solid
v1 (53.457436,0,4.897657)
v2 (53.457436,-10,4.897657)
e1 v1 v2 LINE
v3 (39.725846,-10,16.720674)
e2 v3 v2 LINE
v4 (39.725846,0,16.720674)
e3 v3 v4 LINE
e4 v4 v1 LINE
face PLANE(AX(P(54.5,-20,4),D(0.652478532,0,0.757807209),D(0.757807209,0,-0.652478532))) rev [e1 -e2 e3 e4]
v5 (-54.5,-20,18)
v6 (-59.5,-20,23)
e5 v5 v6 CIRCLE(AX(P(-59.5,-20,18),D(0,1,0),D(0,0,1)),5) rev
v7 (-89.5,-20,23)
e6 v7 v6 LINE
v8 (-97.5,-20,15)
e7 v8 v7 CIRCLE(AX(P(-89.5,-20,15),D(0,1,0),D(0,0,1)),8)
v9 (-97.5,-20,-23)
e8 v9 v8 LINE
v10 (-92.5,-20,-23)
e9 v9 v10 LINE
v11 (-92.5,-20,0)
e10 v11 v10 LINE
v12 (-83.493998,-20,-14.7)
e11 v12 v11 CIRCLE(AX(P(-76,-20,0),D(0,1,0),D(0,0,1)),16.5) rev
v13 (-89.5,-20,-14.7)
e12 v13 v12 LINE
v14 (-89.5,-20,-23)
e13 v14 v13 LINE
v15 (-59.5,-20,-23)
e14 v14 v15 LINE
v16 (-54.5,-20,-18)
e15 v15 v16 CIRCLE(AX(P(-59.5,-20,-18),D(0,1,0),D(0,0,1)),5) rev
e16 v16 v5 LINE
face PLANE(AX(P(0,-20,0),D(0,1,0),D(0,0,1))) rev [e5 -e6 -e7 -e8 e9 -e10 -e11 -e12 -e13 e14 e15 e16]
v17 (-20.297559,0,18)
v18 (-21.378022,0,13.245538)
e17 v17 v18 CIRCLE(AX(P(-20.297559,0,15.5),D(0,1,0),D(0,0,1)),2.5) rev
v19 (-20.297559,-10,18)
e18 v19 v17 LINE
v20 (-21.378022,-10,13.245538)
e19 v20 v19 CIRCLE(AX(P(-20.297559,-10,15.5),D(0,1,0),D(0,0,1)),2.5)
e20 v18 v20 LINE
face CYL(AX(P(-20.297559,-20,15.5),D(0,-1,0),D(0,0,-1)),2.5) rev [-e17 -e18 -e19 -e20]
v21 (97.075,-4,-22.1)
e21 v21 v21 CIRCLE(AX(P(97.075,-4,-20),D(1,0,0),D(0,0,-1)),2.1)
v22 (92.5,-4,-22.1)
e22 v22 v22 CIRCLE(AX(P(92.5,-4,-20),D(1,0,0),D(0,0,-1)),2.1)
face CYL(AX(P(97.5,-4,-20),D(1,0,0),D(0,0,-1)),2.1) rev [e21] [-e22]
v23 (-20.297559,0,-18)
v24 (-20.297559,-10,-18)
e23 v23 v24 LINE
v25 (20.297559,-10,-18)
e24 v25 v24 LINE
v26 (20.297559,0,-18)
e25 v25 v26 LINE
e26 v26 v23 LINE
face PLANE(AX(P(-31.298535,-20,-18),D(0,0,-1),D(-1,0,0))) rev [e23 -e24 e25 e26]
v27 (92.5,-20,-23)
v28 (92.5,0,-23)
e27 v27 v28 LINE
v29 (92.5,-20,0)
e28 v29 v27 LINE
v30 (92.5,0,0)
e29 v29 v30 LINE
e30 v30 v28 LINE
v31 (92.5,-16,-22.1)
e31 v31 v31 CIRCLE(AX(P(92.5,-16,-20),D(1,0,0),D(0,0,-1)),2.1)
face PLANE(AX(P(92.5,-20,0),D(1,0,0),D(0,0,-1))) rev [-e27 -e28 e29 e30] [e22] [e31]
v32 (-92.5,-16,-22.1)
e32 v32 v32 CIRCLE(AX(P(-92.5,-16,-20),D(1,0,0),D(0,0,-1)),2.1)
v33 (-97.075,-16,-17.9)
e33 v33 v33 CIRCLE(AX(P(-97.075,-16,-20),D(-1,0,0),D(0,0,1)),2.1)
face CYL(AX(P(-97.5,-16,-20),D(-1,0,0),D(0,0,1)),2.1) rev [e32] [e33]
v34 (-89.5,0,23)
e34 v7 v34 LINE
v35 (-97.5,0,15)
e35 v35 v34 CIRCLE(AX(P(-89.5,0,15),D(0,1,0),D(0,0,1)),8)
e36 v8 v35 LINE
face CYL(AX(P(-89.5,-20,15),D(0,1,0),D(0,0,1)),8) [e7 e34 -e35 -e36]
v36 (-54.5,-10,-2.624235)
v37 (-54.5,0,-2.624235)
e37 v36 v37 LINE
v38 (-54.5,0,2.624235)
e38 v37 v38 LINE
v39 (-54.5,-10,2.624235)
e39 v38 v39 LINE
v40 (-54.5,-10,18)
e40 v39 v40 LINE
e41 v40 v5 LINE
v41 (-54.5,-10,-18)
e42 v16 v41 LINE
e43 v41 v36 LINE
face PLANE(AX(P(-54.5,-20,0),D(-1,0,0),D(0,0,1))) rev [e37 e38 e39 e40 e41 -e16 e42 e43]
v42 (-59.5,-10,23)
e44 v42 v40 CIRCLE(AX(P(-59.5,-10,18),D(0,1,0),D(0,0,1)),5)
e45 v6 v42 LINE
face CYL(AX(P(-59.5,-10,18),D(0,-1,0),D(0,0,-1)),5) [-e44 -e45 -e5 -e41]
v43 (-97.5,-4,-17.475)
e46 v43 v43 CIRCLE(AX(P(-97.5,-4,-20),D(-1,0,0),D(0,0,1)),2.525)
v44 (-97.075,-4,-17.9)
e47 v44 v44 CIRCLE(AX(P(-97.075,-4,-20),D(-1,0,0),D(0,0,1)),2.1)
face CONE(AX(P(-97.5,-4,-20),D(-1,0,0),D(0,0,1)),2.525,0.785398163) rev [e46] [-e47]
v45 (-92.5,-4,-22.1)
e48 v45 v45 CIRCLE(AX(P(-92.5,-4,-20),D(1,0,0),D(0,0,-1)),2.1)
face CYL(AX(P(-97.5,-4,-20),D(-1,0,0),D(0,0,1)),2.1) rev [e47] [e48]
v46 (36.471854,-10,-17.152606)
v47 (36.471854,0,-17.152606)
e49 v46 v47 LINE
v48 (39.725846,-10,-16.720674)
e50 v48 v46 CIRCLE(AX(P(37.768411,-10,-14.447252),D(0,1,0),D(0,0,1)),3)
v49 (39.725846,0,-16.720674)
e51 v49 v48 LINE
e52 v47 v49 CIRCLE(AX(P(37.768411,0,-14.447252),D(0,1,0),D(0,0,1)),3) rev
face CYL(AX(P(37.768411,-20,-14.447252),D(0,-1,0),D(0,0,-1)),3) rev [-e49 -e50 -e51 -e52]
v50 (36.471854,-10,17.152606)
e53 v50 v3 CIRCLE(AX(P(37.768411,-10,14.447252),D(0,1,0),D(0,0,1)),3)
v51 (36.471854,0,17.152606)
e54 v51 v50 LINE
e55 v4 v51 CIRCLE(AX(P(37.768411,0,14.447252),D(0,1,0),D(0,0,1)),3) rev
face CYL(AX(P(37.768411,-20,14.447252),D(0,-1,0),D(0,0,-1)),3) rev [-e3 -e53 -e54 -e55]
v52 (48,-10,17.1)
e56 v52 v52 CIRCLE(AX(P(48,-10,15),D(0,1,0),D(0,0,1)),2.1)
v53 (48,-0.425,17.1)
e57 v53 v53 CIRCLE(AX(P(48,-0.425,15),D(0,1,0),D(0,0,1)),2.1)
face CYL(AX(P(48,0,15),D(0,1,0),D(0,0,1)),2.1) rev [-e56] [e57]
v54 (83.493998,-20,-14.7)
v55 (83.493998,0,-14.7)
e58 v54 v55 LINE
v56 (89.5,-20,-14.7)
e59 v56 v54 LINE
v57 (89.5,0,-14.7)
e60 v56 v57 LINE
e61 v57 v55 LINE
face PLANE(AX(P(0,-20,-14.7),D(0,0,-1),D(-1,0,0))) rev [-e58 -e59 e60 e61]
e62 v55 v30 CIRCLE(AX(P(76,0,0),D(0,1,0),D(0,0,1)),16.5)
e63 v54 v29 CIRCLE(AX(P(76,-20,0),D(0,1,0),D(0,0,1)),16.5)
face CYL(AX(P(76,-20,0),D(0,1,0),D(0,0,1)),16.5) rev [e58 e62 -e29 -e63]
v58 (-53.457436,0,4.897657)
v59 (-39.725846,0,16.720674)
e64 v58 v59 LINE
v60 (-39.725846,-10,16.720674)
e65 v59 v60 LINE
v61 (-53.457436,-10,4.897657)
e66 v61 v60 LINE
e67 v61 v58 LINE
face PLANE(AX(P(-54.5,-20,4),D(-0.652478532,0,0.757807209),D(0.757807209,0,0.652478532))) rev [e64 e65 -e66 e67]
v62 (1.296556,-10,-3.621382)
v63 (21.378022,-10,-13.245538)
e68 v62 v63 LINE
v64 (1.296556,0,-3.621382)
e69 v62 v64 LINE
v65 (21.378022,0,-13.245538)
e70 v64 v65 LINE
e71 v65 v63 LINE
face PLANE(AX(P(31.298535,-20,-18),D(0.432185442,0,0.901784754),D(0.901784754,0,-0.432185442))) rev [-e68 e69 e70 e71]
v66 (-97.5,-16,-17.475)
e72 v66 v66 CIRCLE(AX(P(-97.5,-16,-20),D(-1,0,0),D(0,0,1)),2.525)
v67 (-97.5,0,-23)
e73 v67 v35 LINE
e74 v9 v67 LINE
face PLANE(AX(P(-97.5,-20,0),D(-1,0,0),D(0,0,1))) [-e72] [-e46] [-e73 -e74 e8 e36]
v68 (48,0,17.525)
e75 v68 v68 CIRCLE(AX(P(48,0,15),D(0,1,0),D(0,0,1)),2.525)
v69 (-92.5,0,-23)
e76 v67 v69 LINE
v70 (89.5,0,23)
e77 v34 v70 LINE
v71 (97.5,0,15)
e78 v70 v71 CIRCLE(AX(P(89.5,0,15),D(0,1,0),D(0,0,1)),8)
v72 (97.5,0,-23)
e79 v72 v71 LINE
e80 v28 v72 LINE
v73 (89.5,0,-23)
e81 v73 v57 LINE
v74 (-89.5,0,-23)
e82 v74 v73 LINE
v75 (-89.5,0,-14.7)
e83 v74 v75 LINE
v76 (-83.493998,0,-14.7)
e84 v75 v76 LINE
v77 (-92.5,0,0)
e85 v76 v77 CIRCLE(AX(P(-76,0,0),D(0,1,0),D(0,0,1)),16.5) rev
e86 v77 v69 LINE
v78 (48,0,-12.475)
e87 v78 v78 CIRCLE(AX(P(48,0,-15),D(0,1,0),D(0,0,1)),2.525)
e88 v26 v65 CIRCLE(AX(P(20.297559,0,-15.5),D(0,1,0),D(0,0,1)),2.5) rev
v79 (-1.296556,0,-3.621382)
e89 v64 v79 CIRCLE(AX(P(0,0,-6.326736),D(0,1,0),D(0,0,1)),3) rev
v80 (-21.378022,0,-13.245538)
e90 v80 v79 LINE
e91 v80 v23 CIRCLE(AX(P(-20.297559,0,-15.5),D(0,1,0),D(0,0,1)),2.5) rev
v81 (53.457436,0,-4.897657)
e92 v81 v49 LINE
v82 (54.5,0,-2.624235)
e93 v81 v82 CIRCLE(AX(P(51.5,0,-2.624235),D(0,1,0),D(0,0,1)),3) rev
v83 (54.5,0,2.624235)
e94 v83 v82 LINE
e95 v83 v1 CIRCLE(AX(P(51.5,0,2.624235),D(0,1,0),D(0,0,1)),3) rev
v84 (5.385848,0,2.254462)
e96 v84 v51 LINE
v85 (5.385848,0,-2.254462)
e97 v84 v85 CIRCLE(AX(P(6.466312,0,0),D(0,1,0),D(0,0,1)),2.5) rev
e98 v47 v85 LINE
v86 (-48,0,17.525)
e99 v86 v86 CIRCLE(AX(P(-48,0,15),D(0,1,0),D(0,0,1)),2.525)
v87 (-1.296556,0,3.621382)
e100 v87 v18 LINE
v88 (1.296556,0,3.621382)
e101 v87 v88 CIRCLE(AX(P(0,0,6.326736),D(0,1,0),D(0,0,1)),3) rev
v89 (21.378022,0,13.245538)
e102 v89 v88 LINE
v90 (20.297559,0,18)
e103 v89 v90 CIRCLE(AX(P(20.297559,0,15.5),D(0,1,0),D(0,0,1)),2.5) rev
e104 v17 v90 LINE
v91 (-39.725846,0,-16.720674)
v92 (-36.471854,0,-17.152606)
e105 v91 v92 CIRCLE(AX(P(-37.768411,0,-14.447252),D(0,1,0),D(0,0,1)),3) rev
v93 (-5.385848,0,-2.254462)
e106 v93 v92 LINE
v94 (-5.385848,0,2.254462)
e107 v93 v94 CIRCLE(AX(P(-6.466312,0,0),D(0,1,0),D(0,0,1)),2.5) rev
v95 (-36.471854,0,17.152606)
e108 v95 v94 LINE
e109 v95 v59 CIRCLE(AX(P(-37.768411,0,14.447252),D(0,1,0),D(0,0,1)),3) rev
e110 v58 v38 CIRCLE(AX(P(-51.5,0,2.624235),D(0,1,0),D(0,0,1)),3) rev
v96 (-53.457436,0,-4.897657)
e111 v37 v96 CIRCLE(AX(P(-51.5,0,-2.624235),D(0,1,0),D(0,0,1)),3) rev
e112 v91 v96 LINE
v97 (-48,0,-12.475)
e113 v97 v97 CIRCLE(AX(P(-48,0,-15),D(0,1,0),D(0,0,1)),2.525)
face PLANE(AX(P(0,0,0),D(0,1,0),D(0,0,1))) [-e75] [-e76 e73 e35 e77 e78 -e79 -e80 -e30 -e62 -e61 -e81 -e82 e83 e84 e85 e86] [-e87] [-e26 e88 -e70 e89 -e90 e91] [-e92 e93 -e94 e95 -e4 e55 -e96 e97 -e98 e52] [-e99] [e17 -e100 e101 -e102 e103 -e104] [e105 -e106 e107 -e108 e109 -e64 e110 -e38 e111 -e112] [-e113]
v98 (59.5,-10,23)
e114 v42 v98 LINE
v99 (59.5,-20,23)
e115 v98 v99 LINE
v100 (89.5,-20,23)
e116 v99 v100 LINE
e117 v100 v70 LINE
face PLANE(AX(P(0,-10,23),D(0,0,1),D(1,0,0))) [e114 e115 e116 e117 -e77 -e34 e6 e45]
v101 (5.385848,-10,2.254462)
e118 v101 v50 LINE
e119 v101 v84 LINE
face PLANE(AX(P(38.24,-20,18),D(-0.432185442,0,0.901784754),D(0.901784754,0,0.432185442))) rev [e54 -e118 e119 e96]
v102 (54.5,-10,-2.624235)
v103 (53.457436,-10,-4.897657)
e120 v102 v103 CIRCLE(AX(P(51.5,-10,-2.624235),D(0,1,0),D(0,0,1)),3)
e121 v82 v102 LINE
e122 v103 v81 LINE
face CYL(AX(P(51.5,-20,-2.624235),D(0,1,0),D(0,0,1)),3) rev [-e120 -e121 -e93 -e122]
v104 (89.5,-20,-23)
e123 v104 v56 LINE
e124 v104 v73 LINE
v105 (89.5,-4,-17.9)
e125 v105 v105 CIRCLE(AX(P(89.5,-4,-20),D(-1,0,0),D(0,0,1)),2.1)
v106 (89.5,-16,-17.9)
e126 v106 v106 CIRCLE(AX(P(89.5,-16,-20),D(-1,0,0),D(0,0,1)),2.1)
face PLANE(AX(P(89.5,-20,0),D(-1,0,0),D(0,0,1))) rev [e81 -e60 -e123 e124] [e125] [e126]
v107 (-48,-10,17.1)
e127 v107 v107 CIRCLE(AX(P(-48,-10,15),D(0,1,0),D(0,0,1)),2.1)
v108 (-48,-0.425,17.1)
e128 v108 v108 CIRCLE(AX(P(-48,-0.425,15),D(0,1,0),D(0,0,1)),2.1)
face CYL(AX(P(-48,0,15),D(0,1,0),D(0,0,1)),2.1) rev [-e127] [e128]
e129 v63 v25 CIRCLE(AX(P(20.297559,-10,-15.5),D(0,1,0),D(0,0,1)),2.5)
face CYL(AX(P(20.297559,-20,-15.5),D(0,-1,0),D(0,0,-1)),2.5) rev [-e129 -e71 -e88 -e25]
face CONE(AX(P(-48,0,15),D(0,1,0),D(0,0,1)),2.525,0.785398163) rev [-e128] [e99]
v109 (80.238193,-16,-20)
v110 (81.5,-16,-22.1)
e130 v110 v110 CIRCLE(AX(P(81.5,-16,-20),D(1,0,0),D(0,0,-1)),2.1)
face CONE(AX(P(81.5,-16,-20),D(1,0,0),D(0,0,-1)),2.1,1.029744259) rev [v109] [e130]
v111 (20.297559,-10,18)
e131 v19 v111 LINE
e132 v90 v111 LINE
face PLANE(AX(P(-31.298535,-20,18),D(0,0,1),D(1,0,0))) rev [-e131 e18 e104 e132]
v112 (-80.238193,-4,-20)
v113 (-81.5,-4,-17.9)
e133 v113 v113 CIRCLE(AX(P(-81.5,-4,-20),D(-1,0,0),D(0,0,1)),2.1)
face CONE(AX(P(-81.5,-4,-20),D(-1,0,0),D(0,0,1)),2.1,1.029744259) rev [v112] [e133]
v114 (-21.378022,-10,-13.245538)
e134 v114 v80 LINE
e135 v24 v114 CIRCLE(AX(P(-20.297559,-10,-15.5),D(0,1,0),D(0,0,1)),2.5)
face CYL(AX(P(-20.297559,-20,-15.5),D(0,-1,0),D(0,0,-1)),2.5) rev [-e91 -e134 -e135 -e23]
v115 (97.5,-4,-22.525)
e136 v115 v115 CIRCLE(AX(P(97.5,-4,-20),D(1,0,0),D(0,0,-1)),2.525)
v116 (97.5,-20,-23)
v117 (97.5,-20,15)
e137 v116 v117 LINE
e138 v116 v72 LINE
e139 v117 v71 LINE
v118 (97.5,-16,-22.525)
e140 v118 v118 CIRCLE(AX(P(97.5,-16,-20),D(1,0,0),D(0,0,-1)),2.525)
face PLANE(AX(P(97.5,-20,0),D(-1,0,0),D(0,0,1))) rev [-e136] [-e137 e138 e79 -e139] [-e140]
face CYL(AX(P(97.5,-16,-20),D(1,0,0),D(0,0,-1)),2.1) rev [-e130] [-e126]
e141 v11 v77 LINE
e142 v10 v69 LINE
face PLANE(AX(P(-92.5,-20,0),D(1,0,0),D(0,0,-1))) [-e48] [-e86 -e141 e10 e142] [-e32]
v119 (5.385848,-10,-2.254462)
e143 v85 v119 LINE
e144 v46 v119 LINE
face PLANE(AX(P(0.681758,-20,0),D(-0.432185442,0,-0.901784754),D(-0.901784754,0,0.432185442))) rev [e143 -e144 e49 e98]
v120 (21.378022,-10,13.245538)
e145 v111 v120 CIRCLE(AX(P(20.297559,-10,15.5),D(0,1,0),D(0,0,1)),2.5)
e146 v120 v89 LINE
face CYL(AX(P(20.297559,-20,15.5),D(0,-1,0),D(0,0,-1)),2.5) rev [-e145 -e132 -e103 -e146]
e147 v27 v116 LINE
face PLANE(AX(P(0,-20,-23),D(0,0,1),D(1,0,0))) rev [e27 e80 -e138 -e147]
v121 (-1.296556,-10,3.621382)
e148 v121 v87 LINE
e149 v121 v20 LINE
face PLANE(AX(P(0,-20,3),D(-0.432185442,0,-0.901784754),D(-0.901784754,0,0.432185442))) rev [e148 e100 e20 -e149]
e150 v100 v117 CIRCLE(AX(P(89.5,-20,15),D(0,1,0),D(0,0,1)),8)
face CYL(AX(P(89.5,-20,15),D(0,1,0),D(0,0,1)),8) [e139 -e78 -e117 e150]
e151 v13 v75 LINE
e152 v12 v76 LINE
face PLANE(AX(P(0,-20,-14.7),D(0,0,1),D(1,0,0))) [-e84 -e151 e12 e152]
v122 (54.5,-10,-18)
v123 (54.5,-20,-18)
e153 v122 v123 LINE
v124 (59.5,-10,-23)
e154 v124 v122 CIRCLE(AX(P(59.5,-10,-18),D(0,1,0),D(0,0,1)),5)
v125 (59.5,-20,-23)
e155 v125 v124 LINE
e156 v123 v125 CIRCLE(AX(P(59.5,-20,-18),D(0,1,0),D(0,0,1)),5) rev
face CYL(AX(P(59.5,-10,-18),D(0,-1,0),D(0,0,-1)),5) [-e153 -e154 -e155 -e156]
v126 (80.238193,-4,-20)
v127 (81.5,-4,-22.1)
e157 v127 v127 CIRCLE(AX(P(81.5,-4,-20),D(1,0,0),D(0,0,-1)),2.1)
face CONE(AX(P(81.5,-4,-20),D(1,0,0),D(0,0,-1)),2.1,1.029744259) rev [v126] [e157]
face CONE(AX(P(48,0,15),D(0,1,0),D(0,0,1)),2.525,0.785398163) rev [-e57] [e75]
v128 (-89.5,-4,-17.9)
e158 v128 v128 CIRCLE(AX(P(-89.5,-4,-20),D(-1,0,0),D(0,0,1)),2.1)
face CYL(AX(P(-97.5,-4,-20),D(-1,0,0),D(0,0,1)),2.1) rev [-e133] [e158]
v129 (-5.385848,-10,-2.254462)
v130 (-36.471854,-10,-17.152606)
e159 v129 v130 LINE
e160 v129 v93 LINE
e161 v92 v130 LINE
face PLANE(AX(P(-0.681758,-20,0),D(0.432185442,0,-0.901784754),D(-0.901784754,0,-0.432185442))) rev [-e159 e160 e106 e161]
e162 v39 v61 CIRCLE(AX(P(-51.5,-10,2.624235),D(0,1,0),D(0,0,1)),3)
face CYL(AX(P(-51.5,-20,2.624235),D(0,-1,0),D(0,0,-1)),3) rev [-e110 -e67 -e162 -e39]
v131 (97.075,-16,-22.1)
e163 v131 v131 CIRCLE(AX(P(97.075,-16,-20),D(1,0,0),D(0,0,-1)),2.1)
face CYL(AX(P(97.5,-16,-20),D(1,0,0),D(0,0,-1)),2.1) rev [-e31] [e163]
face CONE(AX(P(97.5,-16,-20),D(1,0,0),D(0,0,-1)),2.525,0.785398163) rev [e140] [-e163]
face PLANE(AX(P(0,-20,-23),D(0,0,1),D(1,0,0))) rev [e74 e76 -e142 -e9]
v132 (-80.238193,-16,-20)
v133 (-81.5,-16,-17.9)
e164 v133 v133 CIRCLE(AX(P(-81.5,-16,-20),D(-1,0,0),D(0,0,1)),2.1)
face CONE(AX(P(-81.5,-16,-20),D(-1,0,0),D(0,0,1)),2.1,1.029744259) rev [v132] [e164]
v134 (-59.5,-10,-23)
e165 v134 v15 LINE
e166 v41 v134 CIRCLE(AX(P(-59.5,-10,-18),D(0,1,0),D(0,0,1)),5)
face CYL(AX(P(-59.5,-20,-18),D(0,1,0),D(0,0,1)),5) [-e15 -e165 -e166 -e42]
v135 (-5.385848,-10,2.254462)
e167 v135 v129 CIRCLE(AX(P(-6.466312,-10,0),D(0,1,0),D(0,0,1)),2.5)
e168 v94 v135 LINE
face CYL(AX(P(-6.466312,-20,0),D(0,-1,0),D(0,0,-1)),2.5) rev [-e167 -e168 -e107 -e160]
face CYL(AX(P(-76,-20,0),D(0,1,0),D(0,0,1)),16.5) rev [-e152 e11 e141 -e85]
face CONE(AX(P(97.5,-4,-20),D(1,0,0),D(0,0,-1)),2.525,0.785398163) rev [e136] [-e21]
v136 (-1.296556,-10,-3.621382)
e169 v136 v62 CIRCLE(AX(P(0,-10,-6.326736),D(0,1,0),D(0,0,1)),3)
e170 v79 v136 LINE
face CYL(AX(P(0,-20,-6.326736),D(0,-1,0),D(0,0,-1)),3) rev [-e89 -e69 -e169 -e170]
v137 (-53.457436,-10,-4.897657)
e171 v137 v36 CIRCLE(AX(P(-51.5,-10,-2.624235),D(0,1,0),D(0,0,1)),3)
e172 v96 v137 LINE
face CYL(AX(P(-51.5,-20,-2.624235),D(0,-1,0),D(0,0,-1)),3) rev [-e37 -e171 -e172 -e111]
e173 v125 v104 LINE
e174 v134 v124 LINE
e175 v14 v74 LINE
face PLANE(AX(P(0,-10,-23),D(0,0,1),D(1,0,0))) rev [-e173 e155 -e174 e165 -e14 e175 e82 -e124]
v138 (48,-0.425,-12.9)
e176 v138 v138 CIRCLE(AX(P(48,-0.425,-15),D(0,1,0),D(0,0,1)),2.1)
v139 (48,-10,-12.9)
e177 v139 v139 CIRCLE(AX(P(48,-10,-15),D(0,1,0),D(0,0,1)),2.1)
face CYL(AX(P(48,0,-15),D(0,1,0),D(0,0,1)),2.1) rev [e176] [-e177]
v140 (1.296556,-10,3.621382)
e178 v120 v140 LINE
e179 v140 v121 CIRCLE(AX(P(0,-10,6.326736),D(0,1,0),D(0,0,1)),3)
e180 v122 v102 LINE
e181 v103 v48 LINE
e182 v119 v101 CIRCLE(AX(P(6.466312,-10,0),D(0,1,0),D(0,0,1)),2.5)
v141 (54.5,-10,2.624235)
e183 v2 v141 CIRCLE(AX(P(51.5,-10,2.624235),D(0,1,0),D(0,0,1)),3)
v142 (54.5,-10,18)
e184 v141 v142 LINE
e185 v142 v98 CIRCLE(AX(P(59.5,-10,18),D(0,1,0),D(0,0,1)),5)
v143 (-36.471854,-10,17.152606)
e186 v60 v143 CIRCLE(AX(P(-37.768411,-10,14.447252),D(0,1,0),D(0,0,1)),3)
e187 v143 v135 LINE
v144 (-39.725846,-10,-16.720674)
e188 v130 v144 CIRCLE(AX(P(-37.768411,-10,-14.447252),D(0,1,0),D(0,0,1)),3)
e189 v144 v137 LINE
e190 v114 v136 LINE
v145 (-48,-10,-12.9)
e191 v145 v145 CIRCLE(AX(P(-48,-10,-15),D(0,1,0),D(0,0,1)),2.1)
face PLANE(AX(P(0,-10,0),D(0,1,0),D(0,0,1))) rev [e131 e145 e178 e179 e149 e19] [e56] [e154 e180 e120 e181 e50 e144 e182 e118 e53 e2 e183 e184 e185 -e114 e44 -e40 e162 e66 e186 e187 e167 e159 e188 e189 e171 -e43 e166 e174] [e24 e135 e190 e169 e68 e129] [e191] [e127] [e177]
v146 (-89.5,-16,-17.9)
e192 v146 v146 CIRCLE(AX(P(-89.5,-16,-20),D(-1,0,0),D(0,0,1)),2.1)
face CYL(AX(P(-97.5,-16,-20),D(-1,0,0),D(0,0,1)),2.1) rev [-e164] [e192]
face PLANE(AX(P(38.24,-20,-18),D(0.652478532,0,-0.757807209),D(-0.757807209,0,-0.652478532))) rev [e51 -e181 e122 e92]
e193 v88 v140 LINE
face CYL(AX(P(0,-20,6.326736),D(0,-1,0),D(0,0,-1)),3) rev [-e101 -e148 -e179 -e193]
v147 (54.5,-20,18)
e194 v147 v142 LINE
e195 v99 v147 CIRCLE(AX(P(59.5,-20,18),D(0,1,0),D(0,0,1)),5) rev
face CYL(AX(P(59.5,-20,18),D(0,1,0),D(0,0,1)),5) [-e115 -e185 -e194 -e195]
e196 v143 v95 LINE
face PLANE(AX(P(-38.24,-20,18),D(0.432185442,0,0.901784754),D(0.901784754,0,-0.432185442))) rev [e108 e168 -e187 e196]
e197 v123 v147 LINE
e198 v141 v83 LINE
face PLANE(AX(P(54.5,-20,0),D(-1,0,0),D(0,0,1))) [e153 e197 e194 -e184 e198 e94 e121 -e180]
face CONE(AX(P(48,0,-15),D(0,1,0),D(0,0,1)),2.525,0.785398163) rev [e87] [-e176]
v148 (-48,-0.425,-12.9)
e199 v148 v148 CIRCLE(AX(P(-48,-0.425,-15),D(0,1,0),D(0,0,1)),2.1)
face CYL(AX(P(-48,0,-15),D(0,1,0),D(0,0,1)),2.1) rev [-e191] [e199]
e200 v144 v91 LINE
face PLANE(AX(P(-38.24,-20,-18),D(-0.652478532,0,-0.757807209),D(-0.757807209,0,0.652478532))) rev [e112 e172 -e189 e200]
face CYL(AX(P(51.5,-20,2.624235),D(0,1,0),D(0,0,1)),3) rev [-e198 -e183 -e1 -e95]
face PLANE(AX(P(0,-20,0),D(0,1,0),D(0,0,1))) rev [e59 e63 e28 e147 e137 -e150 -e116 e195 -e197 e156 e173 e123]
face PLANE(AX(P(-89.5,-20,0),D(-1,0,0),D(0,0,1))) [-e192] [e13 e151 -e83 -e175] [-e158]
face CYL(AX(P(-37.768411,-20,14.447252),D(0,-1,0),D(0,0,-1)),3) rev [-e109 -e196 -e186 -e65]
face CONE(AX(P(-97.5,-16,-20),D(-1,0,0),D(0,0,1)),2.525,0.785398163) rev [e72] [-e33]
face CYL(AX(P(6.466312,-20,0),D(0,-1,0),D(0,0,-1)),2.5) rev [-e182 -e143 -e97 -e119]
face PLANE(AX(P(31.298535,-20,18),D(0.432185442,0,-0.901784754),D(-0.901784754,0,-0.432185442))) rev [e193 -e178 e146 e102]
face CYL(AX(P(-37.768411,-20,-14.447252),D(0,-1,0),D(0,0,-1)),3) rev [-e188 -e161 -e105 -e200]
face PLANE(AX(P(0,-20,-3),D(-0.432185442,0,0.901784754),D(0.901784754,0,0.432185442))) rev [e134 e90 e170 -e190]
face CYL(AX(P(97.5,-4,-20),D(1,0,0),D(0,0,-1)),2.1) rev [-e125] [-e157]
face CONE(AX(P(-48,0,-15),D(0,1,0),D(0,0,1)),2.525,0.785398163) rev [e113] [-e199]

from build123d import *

# Parameters (mm, degrees)
SKETCH1_W                  = 109
SKETCH1_H                  = 46
BOSS_EXTRUDE1_DEPTH        = 10
BOSS_EXTRUDE2_DEPTH        = 20
FILLET1_R                  = 5
CUT_EXTRUDE1_DEPTH         = 103.153071417
M5_TAPPED_HOLE2_AT_2_COUNT = 2
M5_TAPPED_HOLE2_AT_2_PITCH = 12
FILLET2_R                  = 2.5
FILLET3_R                  = 3


# Read off the part's stored shape, not the designer's step: M5 Tapped Hole1
with BuildPart() as part:
    # Sketch1 → Boss-Extrude1 (new body)
    with BuildSketch(Plane(origin=(0, 0, 0), x_dir=(1, 0, 0), z_dir=(0, 1, 0))):
        Rectangle(SKETCH1_W, SKETCH1_H)
    extrude(amount=-BOSS_EXTRUDE1_DEPTH)

    # Sketch1<3> → Boss-Extrude2 (add)
    with BuildSketch(Plane(origin=(0, 0, 0), x_dir=(1, 0, 0), z_dir=(0, 1, 0))):
        with BuildLine():
            Line((-54.5, -23), (-54.5, 23))
            Line((-54.5, 23), (-89.5, 23))
            Line((-89.5, 23), (-89.5, 14.7))
            Line((-89.5, 14.7), (-83.493997598, 14.7))
            ThreePointArc((-83.493997598, 14.7), (-61.930512441, -8.619716922), (-92.5, 0))
            Line((-92.5, 0), (-92.5, 23))
            Line((-92.5, 23), (-97.5, 23))
            Line((-97.5, 23), (-97.5, -15))
            ThreePointArc((-97.5, -15), (-95.156854249, -20.656854249), (-89.5, -23))
            Line((-89.5, -23), (-54.5, -23))
        make_face()
        with BuildLine():
            Line((92.5, 23), (92.5, 0))
            ThreePointArc((92.5, 0), (61.930512441, -8.619716922), (83.493997598, 14.7))
            Line((83.493997598, 14.7), (89.5, 14.7))
            Line((89.5, 14.7), (89.5, 23))
            Line((89.5, 23), (54.5, 23))
            Line((54.5, 23), (54.5, -23))
            Line((54.5, -23), (89.5, -23))
            ThreePointArc((89.5, -23), (95.156854249, -20.656854249), (97.5, -15))
            Line((97.5, -15), (97.5, 23))
            Line((97.5, 23), (92.5, 23))
        make_face()
    extrude(amount=-BOSS_EXTRUDE2_DEPTH)

    # Fillet1
    fillet1_edges = [part.edges().sort_by_distance(p)[0] for p in [
        (-54.5, -15, -23),
        (-54.5, -15, 23),
        (54.5, -15, 23),
        (54.5, -15, -23),
    ]]
    fillet(fillet1_edges, radius=FILLET1_R)

    # M5 Tapped Hole1 outline → M5 Tapped Hole1 (revolve, cut)
    with BuildSketch(Plane(origin=(48, 0, -15), x_dir=(1, 0, 0), z_dir=(0, 0, 1))):
        Polygon((0, -10), (2.1, -10), (2.1, -0.425), (2.525, 0), (0, 0), align=None)
    revolve(axis=Axis((48, 0, -15), (0, 1, 0)), mode=Mode.SUBTRACT)

    # M5 Tapped Hole1 2 outline → M5 Tapped Hole1 2 (revolve, cut)
    with BuildSketch(Plane(origin=(-48, 0, 15), x_dir=(1, 0, 0), z_dir=(0, 0, 1))):
        Polygon((0, -10), (2.1, -10), (2.1, -0.425), (2.525, 0), (0, 0), align=None)
    revolve(axis=Axis((-48, 0, 15), (0, 1, 0)), mode=Mode.SUBTRACT)

    # M5 Tapped Hole1 3 outline → M5 Tapped Hole1 3 (revolve, cut)
    with BuildSketch(Plane(origin=(-48, 0, -15), x_dir=(1, 0, 0), z_dir=(0, 0, 1))):
        Polygon((0, -10), (2.1, -10), (2.1, -0.425), (2.525, 0), (0, 0), align=None)
    revolve(axis=Axis((-48, 0, -15), (0, 1, 0)), mode=Mode.SUBTRACT)

    # M5 Tapped Hole1 4 outline → M5 Tapped Hole1 4 (revolve, cut)
    with BuildSketch(Plane(origin=(48, 0, 15), x_dir=(1, 0, 0), z_dir=(0, 0, 1))):
        Polygon((0, -10), (2.1, -10), (2.1, -0.425), (2.525, 0), (0, 0), align=None)
    revolve(axis=Axis((48, 0, 15), (0, 1, 0)), mode=Mode.SUBTRACT)

    # Sketch7 → Cut-Extrude1 (cut, through all)
    with BuildSketch(Plane(origin=(0, 0, 0), x_dir=(1, 0, 0), z_dir=(0, 1, 0))):
        Polygon((-31.298535282, 18), (31.298535282, 18), (0, 3), align=None)
        Polygon((-54.5, 4), (-54.5, -4), (-38.24, -18), (-0.681757662, 0), (-38.24, 18), align=None)
        Polygon((31.298535282, -18), (0, -3), (-31.298535282, -18), align=None)
        Polygon((38.24, -18), (0.681757662, 0), (38.24, 18), (54.5, 4), (54.5, -4), align=None)
    extrude(amount=-CUT_EXTRUDE1_DEPTH, mode=Mode.SUBTRACT)

    # Sketch9 → M5 Tapped Hole2 (revolve, cut)
    with BuildSketch(Plane(origin=(97.5, -4, -20), x_dir=(0, 0, -1), z_dir=(0, 1, 0))):
        Polygon((0, 0), (0, 17.2618073), (2.1, 16), (2.1, 0.425), (2.525, 0), align=None)
    m5_tapped_hole2 = revolve(axis=Axis((103.85, -4, -20), (-1, 0, 0)), mode=Mode.SUBTRACT)

    # M5 Tapped Hole2 at 2: M5 Tapped Hole2 ×2
    with Locations(*[(0, -i * M5_TAPPED_HOLE2_AT_2_PITCH, 0) for i in range(1, M5_TAPPED_HOLE2_AT_2_COUNT)]):
        add(m5_tapped_hole2, mode=Mode.SUBTRACT)

    # Mirror1: M5 Tapped Hole2 across plane
    add(m5_tapped_hole2.mirror(Plane(origin=(0, 0, 0), x_dir=(0, 0, 1), z_dir=(1, 0, 0))), mode=Mode.SUBTRACT)

    # Mirror1 copy 1 sketch → Mirror1 copy 1 (revolve, cut)
    with BuildSketch(Plane(origin=(-97.5, -16, -20), x_dir=(0, 0, -1), z_dir=(0, 1, 0))):
        Polygon((0, 0), (0, -17.2618073), (2.1, -16), (2.1, -0.425), (2.525, 0), align=None)
    revolve(axis=Axis((-103.85, -16, -20), (-1, 0, 0)), mode=Mode.SUBTRACT)

    # Fillet2
    fillet2_edges = [part.edges().sort_by_distance(p)[0] for p in [
        (31.298535282, -5, 18),
        (-31.298535282, -5, 18),
        (-0.681757662, -5, 0),
        (0.681757662, -5, 0),
        (-31.298535282, -5, -18),
        (31.298535282, -5, -18),
    ]]
    fillet(fillet2_edges, radius=FILLET2_R)

    # Fillet3
    fillet3_edges = [part.edges().sort_by_distance(p)[0] for p in [
        (0, -5, 3),
        (-38.24, -5, -18),
        (-54.5, -5, -4),
        (-38.24, -5, 18),
        (-54.5, -5, 4),
        (38.24, -5, 18),
        (54.5, -5, 4),
        (38.24, -5, -18),
        (54.5, -5, -4),
        (0, -5, -3),
    ]]
    fillet(fillet3_edges, radius=FILLET3_R)


solid = part.part
